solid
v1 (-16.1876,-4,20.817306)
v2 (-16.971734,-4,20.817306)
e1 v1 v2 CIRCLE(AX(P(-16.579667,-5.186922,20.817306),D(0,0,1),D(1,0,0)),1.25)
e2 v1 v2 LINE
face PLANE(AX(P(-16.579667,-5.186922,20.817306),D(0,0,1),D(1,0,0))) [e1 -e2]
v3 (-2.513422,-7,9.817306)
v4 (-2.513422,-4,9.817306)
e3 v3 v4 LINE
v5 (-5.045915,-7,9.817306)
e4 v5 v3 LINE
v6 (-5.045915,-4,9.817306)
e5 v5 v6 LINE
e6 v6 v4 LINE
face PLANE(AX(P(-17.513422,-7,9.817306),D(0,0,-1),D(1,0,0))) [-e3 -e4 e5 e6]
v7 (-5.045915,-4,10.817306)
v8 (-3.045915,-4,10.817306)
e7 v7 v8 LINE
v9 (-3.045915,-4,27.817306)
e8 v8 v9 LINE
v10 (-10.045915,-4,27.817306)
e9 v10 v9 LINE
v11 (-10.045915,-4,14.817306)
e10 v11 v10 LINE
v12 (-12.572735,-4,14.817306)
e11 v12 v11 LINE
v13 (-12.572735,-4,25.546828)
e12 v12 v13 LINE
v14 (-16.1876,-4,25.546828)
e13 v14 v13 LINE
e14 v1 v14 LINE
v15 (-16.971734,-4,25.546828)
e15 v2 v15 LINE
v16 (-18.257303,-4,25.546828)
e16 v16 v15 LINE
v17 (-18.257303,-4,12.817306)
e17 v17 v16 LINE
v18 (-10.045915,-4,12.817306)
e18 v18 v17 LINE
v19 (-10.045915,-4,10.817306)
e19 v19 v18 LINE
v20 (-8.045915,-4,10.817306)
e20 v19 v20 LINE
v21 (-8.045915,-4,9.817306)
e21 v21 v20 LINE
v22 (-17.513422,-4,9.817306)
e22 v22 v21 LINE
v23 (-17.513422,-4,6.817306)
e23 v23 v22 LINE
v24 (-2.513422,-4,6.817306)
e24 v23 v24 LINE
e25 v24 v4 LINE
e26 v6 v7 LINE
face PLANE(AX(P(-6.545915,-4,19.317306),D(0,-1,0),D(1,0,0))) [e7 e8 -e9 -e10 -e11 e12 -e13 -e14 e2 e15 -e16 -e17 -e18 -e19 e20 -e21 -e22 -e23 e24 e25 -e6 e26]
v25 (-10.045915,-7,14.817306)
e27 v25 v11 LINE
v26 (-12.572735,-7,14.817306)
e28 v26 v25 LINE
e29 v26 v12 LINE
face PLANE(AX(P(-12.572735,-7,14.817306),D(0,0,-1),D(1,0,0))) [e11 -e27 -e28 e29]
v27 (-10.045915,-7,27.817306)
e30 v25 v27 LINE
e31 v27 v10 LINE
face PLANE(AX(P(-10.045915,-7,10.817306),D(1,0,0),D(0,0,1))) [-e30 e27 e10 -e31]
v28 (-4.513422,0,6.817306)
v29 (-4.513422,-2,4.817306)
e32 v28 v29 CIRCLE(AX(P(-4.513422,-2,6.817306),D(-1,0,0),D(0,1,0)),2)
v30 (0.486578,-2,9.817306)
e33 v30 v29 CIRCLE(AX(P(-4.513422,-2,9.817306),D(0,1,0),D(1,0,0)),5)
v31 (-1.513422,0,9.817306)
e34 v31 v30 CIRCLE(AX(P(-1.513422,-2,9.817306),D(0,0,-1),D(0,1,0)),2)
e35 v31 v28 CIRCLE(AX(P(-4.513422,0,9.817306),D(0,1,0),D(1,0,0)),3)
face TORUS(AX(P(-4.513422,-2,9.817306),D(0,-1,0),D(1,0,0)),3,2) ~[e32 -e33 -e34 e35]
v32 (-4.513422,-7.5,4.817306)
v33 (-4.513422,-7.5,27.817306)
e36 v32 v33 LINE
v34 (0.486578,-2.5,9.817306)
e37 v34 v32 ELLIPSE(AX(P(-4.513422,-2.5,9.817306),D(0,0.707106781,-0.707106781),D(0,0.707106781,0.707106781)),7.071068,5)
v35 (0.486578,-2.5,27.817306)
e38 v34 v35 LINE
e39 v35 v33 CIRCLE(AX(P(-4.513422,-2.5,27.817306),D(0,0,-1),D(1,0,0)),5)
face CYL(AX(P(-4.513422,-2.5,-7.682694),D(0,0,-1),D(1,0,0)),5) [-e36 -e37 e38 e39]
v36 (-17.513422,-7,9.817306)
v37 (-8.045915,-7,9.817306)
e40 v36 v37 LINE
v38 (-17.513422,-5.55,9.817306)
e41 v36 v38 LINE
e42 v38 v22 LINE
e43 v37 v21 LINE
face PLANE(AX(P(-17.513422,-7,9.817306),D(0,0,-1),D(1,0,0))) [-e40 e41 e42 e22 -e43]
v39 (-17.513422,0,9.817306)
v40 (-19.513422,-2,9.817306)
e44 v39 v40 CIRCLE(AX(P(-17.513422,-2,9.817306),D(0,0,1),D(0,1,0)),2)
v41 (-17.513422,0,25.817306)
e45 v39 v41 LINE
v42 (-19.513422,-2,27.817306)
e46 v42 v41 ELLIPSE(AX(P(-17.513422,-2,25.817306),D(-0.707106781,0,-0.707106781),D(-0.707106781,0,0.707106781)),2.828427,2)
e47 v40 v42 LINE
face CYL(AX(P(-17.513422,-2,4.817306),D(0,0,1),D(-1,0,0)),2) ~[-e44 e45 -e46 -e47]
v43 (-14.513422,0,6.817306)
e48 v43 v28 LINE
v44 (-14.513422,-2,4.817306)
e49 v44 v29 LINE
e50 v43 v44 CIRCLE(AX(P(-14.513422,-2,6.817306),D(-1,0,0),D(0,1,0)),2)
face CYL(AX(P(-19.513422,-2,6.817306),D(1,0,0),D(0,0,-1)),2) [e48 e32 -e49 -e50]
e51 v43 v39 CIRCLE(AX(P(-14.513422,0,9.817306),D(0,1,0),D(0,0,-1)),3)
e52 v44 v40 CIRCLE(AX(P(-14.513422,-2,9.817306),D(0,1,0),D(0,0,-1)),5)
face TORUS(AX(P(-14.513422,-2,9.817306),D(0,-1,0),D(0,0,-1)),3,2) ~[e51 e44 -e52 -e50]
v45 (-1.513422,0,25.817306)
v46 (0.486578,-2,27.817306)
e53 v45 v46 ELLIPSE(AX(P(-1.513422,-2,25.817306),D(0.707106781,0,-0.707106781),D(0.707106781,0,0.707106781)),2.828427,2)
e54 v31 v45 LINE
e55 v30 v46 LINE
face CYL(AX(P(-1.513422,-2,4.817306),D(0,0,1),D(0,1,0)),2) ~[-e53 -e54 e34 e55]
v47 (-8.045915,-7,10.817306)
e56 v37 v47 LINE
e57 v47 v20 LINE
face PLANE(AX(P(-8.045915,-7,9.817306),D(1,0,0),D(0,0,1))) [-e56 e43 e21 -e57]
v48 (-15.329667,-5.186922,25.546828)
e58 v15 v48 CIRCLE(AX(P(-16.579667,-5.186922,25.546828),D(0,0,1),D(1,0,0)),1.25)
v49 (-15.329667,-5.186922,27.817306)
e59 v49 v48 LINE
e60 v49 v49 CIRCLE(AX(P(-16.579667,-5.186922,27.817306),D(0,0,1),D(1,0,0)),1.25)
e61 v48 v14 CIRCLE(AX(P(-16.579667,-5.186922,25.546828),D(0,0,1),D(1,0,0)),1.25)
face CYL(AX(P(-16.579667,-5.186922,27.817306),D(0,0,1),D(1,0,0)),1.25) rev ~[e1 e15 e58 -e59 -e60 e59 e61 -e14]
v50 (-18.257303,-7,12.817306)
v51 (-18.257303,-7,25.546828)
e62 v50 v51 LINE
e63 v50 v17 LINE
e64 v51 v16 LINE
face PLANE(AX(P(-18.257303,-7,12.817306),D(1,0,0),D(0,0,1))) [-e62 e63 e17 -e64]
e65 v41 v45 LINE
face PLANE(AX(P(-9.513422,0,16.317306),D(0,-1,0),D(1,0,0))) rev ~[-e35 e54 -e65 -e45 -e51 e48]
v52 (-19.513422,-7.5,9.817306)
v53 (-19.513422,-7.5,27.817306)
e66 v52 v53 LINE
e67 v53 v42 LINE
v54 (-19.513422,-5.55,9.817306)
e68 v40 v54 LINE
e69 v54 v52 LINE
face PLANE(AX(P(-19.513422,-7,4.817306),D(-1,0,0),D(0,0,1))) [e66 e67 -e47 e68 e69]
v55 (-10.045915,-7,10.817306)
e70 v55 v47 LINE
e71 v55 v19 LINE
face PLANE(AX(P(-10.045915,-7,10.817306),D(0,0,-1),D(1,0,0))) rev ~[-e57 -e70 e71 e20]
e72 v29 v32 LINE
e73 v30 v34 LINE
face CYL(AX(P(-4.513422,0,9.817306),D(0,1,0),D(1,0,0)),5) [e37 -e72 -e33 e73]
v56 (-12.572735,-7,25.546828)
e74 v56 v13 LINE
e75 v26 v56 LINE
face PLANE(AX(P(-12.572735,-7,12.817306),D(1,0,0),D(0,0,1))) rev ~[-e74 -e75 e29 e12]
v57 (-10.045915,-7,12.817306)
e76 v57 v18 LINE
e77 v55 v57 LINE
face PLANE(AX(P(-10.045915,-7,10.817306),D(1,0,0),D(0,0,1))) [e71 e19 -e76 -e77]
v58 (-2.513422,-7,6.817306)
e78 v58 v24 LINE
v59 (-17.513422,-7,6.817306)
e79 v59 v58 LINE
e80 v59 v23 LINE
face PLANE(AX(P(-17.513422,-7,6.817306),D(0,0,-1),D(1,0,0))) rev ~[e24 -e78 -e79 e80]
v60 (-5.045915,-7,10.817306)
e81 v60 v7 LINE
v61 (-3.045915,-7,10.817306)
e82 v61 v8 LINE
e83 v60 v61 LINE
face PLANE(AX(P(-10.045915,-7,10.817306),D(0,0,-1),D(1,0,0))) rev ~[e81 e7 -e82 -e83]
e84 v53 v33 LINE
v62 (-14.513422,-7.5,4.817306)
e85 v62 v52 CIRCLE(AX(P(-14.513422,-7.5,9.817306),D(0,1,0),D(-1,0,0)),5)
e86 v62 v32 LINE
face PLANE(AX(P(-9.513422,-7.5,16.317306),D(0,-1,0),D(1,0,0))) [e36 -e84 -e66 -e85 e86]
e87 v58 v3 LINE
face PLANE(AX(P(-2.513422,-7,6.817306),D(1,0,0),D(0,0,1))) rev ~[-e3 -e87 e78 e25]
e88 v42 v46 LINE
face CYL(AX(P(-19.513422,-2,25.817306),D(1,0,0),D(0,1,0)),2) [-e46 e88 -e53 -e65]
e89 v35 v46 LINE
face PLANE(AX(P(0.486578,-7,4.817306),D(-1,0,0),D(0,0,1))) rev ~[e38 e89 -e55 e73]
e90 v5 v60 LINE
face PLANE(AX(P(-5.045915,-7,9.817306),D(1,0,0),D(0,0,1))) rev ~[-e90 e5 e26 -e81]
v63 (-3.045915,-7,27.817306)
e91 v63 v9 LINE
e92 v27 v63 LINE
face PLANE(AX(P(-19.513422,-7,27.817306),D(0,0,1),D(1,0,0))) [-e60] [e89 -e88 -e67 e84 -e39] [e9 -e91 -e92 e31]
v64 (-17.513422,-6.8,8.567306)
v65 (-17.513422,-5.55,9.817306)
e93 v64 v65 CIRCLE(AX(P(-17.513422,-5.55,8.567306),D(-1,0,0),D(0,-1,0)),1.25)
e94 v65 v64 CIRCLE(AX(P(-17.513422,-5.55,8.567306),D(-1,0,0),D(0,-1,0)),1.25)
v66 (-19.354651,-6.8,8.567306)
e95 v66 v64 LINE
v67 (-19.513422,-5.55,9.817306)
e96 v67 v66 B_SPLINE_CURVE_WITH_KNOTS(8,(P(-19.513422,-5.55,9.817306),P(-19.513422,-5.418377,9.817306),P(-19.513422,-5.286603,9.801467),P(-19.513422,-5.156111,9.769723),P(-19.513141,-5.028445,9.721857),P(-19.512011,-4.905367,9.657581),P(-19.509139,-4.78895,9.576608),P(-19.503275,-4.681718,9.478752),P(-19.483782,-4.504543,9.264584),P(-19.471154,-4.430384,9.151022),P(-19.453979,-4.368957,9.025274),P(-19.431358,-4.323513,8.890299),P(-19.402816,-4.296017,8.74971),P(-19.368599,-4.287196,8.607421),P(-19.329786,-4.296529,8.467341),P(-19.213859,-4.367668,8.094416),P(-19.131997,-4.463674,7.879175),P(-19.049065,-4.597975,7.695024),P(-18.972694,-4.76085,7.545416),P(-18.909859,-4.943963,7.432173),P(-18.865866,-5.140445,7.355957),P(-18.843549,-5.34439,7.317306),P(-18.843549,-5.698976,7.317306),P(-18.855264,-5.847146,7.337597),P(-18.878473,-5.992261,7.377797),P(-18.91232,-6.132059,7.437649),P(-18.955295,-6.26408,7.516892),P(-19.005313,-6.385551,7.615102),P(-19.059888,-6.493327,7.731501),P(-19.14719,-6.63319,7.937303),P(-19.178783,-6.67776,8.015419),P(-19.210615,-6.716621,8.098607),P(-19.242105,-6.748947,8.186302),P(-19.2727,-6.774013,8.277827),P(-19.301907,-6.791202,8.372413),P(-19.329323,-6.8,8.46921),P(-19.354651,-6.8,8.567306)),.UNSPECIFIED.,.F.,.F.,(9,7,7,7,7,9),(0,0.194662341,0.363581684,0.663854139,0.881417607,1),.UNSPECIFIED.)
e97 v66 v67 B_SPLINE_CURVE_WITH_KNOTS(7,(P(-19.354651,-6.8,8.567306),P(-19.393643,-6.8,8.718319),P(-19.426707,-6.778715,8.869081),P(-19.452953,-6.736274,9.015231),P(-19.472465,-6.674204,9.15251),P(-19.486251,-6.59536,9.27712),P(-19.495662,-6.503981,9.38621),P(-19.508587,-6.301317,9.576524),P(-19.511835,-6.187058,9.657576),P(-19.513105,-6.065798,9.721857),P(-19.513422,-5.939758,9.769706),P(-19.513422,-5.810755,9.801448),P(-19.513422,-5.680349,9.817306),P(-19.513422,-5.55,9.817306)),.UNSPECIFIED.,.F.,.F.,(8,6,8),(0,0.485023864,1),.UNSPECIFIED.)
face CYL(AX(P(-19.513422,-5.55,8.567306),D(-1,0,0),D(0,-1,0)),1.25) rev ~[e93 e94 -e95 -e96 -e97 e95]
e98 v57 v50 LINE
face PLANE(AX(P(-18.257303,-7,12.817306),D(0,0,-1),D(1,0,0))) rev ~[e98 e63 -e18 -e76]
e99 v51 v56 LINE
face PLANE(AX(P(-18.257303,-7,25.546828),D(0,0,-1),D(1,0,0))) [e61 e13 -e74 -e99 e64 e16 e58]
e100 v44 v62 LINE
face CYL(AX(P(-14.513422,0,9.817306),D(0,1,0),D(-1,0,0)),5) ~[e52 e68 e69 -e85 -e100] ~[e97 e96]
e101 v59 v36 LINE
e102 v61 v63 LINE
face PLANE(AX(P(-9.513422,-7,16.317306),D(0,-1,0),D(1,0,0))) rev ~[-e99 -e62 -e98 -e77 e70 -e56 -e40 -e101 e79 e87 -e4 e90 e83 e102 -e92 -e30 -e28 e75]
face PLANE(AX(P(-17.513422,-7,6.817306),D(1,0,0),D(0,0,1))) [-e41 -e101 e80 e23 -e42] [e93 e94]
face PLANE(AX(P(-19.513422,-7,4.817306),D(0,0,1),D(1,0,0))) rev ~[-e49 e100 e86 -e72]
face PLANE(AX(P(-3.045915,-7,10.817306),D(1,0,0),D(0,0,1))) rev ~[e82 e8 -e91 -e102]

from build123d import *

# Parameters (mm, degrees)
F0_W         = 20
F0_H         = 23
F1_DEPTH     = 7
F2_W         = 15
F2_H         = 3
F3_DEPTH     = 3
F4_W         = 7
F4_H         = 17
F5_DEPTH     = 3
F6_W         = 3
F6_H         = 1
F7_DEPTH     = 3
F8_W         = 2.5268201925
F8_H         = 2
F9_DEPTH     = 3
F10_R        = 1.25
F11_DEPTH    = 5
F12_R        = 2
F13_W        = 5.6845681682
F13_H        = 12.7295220874
F14_DEPTH    = 3
F15_W        = 20
F15_H        = 23
F16_DEPTH    = 0.5
F17_T1_DEPTH = 20
F17_T3_DEPTH = 48
F17_T6_ANGLE = 90
F17_T8_ANGLE = 90
F18_R        = 1.25
F19_DEPTH    = 7


# Not quite as in the source:
# - a fillet or chamfer that OpenCascade refuses, or shapes differently, is made with other operations: its cross-section is extruded or revolved along the edge and cut away or added


with BuildPart() as f1:
    # F0 (on Front) → F1 (new body)
    with BuildSketch(Plane.XZ):
        with Locations((-9.5134219155, 16.3173061975)):
            Rectangle(F0_W, F0_H)
    extrude(amount=F1_DEPTH)

    # F2 (on face) → F3 (cut)
    with BuildSketch(Plane.XZ.offset(7)):
        with Locations((-10.0134219155, 8.3173061975)):
            Rectangle(F2_W, F2_H)
    extrude(amount=-F3_DEPTH, mode=Mode.SUBTRACT)

    # F4 (on face) → F5 (cut)
    with BuildSketch(Plane.XZ.offset(7)):
        with Locations((-6.5459148027, 19.3173061975)):
            Rectangle(F4_W, F4_H)
    extrude(amount=-F5_DEPTH, mode=Mode.SUBTRACT)

    # F6 (on face) → F7 (cut)
    with BuildSketch(Plane.XZ.offset(7)):
        with Locations((-6.5459148027, 10.3173061975)):
            Rectangle(F6_W, F6_H)
    extrude(amount=-F7_DEPTH, mode=Mode.SUBTRACT)

    # F8 (on face) → F9 (cut)
    with BuildSketch(Plane.XZ.offset(7)):
        with Locations((-11.3093248989, 13.8173061975)):
            Rectangle(F8_W, F8_H)
    extrude(amount=-F9_DEPTH, mode=Mode.SUBTRACT)

    # F10 (on face) → F11 (cut)
    with BuildSketch(Plane(origin=(-19.5134219155, 0, 0), x_dir=(0, -1, 0), z_dir=(-1, 0, 0))):
        with Locations((5.55, 8.5673061975)):
            Circle(F10_R)
    extrude(amount=-F11_DEPTH, mode=Mode.SUBTRACT)

    # F12
    f12_edges = [f1.edges().sort_by_distance(p)[0] for p in [
        (0.486578, 0, 16.317306),
        (-19.513422, 0, 16.317306),
        (-9.513422, 0, 27.817306),
        (-9.513422, 0, 4.817306),
    ]]
    fillet(f12_edges, radius=F12_R)

    # F13 (on face) → F14 (cut)
    with BuildSketch(Plane.XZ.offset(7)):
        with Locations((-15.4150190793, 19.1820672412)):
            Rectangle(F13_W, F13_H)
    extrude(amount=-F14_DEPTH, mode=Mode.SUBTRACT)

    # F15 (on face) → F16 (join)
    with BuildSketch(Plane.XZ.offset(7)):
        with Locations((-9.5134219155, 16.3173061975)):
            Rectangle(F15_W, F15_H)
    extrude(amount=F16_DEPTH)

    # F17: fillet of radius 5 on 3 edges, made by hand

    # F17_s2 → F17_t1 (cut)
    with BuildSketch(Plane.XZ):
        with BuildLine():
            ThreePointArc((-19.5134219155, 9.8173061975), (-18.0489558214, 6.2817722916), (-14.5134219155, 4.8173061975))
            Line((-14.5134219155, 4.8173061975), (-19.5134219155, 4.8173061975))
            Line((-19.5134219155, 4.8173061975), (-19.5134219155, 9.8173061975))
        make_face()
        with BuildLine():
            ThreePointArc((0.4865780845, 9.8173061975), (-0.9778880095, 6.2817722916), (-4.5134219155, 4.8173061975))
            Line((-4.5134219155, 4.8173061975), (0.4865780845, 4.8173061975))
            Line((0.4865780845, 4.8173061975), (0.4865780845, 9.8173061975))
        make_face()
    extrude(amount=F17_T1_DEPTH, mode=Mode.SUBTRACT)

    # F17_s4 → F17_t3 (cut)
    with BuildSketch(Plane.XY.offset(-7.6826938025)):
        with BuildLine():
            ThreePointArc((0.4865780845, -2.5), (-0.9778880095, -6.0355339059), (-4.5134219155, -7.5))
            Line((-4.5134219155, -7.5), (0.4865780845, -7.5))
            Line((0.4865780845, -7.5), (0.4865780845, -2.5))
        make_face()
    extrude(amount=F17_T3_DEPTH, mode=Mode.SUBTRACT)

    # F17_s5 → F17_t6 (revolve, cut)
    with BuildSketch(Plane.XY.offset(9.8173061975)):
        with BuildLine():
            ThreePointArc((-1.5134219155, 0), (-0.0992083531, -0.5857864376), (0.4865780845, -2))
            Line((0.4865780845, -2), (0.4865780845, 0))
            Line((0.4865780845, 0), (-1.5134219155, 0))
        make_face()
    revolve(axis=Axis((-4.5134219155, 0, 9.8173061975), (0, 1, 0)), revolution_arc=F17_T6_ANGLE, mode=Mode.SUBTRACT)

    # F17_s7 → F17_t8 (revolve, cut)
    with BuildSketch(Plane.YZ.offset(-14.5134219155)):
        with BuildLine():
            ThreePointArc((0, 6.8173061975), (-0.5857864376, 5.4030926351), (-2, 4.8173061975))
            Line((-2, 4.8173061975), (0, 4.8173061975))
            Line((0, 4.8173061975), (0, 6.8173061975))
        make_face()
    revolve(axis=Axis((-14.5134219155, 0, 9.8173061975), (0, 1, 0)), revolution_arc=F17_T8_ANGLE, mode=Mode.SUBTRACT)

    # F18 (on face) → F19 (cut)
    with BuildSketch(Plane.XY.offset(27.8173061975)):
        with Locations((-16.5796671063, -5.1869219169)):
            Circle(F18_R)
    extrude(amount=-F19_DEPTH, mode=Mode.SUBTRACT)


solid = f1.part
